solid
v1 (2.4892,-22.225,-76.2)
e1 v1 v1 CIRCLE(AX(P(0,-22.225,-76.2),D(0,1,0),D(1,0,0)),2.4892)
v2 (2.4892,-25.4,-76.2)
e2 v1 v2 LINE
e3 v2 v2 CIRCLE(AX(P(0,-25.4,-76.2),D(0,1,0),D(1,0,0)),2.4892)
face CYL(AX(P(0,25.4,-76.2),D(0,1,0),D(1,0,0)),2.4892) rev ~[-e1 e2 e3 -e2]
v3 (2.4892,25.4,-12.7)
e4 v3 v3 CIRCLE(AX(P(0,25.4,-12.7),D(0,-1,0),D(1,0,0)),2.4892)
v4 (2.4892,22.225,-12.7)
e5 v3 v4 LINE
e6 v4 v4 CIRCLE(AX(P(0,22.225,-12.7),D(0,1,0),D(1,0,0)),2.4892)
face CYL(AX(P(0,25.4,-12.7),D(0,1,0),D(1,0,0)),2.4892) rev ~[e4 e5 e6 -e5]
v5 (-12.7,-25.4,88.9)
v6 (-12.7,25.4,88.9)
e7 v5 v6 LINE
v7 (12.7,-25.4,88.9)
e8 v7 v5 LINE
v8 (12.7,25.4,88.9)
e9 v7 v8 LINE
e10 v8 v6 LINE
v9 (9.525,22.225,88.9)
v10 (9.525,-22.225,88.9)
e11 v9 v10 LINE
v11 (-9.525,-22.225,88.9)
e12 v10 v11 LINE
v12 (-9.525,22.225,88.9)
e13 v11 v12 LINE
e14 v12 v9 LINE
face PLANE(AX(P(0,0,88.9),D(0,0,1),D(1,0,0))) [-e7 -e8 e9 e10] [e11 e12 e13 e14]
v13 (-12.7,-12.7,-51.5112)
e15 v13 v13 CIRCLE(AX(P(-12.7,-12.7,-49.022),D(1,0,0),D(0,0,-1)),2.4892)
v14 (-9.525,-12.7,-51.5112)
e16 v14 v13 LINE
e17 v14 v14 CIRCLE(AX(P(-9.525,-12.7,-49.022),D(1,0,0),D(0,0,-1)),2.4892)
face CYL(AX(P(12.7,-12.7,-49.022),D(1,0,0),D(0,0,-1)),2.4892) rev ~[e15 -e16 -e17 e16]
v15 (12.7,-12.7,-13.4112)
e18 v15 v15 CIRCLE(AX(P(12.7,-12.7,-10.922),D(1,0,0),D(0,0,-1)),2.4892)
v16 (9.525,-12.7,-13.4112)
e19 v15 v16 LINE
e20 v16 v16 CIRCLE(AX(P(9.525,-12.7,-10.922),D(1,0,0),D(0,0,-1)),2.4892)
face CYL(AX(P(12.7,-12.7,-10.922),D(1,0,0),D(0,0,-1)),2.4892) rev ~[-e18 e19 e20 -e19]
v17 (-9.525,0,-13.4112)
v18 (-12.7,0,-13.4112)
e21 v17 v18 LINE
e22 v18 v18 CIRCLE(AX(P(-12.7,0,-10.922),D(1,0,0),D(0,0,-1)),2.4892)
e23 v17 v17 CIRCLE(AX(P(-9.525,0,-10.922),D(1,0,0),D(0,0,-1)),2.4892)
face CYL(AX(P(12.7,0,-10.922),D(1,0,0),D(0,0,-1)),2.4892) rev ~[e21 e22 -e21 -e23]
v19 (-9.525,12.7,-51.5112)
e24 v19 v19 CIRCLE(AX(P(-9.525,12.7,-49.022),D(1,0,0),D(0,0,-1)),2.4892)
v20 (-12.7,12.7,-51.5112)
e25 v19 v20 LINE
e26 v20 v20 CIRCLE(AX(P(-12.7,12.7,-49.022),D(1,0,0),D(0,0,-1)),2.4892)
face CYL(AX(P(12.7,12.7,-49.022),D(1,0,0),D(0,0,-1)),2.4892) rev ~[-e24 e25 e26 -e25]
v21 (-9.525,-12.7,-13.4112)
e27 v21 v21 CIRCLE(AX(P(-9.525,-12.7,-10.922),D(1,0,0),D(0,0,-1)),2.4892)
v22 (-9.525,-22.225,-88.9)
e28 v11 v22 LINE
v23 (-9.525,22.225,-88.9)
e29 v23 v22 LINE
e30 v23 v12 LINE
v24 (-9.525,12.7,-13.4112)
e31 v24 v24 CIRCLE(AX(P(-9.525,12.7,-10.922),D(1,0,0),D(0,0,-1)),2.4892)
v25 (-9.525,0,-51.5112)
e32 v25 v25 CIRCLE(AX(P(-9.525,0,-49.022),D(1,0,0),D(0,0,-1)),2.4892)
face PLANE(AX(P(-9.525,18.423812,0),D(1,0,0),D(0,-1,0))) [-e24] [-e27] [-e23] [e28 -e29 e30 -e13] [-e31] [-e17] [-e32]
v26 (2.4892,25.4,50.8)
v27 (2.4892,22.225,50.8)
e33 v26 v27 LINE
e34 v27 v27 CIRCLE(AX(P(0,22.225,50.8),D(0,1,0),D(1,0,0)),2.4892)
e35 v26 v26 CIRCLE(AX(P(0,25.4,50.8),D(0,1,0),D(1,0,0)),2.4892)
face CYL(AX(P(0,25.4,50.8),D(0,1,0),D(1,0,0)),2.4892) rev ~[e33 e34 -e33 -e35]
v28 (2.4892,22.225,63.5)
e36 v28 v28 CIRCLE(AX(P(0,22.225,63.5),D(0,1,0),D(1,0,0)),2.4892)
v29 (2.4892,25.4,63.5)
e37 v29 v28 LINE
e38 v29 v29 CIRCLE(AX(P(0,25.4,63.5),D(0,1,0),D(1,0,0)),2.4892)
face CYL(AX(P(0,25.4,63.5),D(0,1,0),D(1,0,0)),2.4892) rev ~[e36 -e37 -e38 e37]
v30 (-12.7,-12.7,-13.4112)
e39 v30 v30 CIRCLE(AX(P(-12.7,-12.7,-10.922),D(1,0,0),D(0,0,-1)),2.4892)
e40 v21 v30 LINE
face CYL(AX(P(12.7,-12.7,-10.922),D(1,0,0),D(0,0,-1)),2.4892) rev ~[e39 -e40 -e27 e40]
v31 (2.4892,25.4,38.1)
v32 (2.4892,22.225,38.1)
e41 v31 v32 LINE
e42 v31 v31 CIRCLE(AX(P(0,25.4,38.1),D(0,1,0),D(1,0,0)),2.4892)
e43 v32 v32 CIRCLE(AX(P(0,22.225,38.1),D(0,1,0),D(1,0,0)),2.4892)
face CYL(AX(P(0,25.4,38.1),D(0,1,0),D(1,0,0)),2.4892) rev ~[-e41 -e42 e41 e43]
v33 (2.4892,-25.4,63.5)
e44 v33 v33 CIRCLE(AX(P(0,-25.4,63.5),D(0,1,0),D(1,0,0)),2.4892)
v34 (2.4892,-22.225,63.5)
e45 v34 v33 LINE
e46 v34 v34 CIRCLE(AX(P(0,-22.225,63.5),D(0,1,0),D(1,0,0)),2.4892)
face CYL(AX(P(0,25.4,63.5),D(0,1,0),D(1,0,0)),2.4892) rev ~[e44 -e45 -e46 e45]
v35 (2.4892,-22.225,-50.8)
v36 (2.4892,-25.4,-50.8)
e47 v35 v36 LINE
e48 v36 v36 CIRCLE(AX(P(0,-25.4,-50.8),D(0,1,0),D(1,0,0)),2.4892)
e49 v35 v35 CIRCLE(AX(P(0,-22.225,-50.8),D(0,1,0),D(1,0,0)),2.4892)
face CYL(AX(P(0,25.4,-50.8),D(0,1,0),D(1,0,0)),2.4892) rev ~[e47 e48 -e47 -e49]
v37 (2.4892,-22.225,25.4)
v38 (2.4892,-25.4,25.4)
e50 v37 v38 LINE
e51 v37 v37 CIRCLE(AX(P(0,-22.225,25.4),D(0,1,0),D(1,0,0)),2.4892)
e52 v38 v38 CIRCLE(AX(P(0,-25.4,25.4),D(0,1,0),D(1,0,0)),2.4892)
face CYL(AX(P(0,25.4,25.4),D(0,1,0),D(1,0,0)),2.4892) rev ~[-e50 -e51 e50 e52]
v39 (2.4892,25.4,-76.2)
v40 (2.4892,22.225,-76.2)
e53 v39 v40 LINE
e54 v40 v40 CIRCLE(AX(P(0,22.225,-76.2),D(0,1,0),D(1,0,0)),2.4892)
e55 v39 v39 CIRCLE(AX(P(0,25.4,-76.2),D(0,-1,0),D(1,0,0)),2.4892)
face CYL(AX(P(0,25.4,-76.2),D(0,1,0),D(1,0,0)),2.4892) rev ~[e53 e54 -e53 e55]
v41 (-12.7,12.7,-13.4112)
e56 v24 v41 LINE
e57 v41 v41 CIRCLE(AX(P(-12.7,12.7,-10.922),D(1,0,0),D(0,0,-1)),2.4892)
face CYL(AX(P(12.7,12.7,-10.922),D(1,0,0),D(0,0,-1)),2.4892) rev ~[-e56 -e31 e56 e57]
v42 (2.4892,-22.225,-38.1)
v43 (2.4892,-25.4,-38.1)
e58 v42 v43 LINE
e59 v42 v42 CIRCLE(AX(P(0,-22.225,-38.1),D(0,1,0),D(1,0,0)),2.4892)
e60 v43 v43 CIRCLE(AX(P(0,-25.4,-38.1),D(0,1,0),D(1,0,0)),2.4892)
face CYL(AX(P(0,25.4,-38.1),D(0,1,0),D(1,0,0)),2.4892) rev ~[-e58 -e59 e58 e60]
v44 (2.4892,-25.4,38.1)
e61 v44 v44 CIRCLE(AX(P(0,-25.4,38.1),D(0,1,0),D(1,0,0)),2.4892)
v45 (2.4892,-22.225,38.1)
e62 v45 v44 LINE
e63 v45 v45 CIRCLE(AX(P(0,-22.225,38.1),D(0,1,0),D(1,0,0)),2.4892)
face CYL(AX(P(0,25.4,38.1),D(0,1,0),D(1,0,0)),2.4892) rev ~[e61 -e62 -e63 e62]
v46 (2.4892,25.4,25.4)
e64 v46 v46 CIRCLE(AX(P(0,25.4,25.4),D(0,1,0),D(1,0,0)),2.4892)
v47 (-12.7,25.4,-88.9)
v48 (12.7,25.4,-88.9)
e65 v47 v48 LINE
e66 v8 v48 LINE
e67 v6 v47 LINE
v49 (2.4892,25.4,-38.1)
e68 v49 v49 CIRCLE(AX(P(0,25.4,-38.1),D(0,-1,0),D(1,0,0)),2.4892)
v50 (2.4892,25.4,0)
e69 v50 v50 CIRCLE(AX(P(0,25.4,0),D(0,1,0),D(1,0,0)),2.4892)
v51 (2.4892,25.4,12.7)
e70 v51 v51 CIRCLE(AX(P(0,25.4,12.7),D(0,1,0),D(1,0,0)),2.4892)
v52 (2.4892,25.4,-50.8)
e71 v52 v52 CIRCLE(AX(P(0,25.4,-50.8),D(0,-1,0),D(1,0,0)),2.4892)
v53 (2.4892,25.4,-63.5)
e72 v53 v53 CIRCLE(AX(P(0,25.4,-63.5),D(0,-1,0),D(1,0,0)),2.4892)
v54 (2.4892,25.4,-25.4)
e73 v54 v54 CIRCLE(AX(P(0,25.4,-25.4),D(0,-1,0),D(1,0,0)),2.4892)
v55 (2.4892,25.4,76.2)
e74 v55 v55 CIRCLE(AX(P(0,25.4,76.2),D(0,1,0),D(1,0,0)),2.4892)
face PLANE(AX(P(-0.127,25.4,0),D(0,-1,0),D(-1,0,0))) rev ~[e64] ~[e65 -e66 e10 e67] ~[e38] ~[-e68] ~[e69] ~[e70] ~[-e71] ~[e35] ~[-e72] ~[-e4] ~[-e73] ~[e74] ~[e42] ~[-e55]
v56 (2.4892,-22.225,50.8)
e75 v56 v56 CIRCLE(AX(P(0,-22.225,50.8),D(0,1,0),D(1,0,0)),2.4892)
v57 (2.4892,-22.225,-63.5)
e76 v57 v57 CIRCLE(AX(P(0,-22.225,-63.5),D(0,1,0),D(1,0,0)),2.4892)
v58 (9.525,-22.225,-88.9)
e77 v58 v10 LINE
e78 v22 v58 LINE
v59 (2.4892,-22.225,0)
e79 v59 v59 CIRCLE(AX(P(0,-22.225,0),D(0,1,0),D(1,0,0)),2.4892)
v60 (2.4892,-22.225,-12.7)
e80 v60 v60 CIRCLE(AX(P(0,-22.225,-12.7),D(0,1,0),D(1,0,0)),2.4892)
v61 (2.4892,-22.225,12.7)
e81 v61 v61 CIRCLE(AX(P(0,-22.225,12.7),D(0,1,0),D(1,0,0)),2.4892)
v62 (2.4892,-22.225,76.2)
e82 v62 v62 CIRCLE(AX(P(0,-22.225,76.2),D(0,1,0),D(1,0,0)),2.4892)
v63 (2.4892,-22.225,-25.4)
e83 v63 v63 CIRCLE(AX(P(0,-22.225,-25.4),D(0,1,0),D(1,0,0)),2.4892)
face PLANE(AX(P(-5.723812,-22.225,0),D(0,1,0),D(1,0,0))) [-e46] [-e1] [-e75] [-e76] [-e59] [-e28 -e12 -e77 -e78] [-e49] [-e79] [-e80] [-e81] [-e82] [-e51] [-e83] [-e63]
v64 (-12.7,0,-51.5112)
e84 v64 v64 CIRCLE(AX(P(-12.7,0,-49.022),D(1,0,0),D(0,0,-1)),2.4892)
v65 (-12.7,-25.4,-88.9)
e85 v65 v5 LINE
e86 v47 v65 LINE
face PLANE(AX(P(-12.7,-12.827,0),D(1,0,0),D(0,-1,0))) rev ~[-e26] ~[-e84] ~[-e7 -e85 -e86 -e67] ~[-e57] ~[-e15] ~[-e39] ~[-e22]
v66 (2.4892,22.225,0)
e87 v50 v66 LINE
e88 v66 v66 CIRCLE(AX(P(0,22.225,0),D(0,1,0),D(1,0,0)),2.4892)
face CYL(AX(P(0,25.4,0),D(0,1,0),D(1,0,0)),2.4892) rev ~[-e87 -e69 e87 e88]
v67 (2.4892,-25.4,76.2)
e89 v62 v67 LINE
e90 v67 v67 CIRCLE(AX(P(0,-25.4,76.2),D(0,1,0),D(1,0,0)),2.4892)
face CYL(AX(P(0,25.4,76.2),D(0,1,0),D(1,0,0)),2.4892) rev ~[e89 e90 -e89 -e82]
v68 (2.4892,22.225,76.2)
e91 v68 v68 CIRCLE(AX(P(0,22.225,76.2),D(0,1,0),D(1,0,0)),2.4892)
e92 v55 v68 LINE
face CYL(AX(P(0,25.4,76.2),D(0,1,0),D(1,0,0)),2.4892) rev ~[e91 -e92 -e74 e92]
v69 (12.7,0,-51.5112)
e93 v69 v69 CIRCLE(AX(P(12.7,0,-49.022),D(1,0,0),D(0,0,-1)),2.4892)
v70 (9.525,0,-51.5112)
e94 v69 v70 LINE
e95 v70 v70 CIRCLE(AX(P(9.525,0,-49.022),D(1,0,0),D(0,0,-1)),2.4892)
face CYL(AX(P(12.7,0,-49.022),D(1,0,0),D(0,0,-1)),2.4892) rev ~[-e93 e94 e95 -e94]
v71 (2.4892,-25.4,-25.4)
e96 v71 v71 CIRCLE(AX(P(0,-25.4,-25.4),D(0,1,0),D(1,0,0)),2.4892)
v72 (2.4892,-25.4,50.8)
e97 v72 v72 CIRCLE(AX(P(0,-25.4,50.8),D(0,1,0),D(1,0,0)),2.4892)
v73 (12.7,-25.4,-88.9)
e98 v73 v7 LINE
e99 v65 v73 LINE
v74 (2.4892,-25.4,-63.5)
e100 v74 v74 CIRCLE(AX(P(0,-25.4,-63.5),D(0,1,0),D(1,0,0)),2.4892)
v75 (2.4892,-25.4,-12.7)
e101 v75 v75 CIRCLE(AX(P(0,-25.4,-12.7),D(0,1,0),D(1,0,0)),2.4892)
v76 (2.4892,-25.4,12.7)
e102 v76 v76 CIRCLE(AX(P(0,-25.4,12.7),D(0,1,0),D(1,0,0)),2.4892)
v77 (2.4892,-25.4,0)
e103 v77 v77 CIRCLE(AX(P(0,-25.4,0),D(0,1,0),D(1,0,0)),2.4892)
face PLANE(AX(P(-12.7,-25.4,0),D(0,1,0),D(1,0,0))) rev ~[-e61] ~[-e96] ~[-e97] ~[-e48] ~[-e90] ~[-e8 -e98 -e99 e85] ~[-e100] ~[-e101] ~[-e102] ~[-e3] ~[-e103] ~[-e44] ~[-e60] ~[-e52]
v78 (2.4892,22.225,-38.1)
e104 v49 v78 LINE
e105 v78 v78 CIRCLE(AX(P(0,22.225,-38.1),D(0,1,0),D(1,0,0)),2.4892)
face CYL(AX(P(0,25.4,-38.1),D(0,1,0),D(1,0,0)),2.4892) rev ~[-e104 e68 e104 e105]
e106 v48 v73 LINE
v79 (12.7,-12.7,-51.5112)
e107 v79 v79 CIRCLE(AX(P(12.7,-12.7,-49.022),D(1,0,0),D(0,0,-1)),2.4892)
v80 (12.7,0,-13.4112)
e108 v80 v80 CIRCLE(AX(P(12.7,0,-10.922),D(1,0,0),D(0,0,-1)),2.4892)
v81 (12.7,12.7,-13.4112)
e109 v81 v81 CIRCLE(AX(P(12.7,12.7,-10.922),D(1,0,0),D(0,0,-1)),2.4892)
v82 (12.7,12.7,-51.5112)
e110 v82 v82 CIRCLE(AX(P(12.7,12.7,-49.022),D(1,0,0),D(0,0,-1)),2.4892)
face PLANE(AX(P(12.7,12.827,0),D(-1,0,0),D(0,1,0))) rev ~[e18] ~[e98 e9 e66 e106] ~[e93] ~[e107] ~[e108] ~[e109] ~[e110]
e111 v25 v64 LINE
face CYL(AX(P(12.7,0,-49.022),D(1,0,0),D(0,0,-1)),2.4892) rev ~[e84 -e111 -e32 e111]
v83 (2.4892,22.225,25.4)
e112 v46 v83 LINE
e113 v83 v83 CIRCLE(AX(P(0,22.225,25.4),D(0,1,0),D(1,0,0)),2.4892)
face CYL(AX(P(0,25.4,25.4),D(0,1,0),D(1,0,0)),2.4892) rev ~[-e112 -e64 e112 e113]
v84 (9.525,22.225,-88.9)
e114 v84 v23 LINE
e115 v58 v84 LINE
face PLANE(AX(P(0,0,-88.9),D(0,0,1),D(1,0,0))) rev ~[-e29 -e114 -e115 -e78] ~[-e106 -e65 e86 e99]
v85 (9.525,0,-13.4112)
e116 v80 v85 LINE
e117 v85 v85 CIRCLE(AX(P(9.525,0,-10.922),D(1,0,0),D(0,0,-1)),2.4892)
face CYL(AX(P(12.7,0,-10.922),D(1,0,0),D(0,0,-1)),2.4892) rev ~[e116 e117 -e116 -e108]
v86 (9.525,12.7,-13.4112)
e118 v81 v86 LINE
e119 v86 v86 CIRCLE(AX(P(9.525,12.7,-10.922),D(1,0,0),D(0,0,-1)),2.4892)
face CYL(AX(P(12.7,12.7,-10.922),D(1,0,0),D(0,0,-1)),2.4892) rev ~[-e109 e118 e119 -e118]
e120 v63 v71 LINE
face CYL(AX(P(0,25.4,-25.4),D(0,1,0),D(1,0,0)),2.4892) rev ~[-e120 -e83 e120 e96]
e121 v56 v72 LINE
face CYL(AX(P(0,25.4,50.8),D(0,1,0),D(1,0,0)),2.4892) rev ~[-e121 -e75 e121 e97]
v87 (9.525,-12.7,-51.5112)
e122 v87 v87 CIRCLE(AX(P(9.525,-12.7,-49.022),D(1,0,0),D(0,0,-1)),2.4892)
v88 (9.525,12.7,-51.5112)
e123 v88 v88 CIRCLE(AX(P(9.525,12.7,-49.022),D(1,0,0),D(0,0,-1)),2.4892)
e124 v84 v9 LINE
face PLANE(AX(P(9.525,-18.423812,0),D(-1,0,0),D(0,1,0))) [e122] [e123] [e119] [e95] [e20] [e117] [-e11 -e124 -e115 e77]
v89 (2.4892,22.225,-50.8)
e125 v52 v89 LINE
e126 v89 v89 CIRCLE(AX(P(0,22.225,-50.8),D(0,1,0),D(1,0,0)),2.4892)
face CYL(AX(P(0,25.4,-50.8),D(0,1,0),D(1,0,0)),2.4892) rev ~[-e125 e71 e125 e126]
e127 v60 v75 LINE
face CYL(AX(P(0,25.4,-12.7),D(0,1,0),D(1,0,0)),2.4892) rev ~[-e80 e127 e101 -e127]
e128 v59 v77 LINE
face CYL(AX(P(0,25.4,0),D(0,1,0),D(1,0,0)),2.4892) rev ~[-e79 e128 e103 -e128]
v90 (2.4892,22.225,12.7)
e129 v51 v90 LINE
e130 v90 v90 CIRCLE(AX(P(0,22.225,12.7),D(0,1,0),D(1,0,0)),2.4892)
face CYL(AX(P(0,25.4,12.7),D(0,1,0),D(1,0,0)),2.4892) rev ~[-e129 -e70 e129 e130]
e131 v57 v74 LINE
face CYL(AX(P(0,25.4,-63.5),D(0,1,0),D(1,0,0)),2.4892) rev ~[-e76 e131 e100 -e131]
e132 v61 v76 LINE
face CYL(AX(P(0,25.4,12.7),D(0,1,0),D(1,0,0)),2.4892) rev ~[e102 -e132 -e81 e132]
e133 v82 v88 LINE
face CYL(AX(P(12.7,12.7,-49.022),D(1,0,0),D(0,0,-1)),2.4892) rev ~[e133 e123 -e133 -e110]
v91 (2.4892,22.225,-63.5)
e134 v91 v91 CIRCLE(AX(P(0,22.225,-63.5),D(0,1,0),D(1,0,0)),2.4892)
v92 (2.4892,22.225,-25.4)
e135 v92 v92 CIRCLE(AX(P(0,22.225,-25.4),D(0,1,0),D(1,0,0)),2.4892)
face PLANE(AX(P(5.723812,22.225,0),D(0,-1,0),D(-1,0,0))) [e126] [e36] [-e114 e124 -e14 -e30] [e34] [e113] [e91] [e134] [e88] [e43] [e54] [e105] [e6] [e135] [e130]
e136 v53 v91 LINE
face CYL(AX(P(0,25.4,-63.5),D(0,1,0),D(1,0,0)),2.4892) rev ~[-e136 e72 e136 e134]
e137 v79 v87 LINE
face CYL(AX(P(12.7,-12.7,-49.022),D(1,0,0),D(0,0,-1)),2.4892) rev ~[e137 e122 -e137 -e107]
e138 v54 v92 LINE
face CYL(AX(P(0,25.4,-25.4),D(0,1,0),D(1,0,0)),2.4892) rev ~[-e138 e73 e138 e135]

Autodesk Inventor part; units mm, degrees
ref_plane "YZ Plane" through (0, 0, 0) normal (1, 0, 0) x (0, 1, 0)
sketch "Corner" plane through (0, 0, 0) normal (0, 0, 1) x (1, 0, 0)
  line L0 (-6.5971, 24.384) -> (-10.9924, 24.384)
  arc A0 (-10.9924, 24.384) -> (-11.684, 23.6924) centre (-10.9924, 23.6924) ccw
  line L1 (-11.684, 23.6924) -> (-11.684, 19.2971)
  arc A1 (-11.684, 19.2971) -> (-10.3994, 18.9412) centre (-10.9924, 19.2971) ccw
  arc A2 (-6.2412, 23.0994) -> (-6.5971, 24.384) centre (-6.5971, 23.6924) ccw
  arc A3 (-6.2412, 23.0994) -> (-10.3994, 18.9412) centre (0, 12.7) ccw
  arc A4 (-4.8895, 22.679) -> (-9.979, 17.5895) centre (0, 12.7) ccw
  line L2 (-9.979, 17.5895) -> (-11.684, 17.5895)
  line L3 (-4.8895, 22.679) -> (-4.8895, 24.384)
  line L4 (-11.684, 23.6924) -> (-11.684, 24.384)
  line L5 (-11.684, 24.384) -> (-10.9924, 24.384)
  line L6 (-11.684, 17.5895) -> (-11.684, 19.2971)
  line L7 (-4.8895, 24.384) -> (-6.5971, 24.384)
  point P0 (-8.4584, 21.1584)
  dimension "d3" = 3.175
  dimension "d4" = 11.1125
  dimension "d8" = 0
  dimension "d9" = 0
  dimension "d10" = 0
  dimension "d11" = 2.159
  dimension "d12" = 2.159
  dimension "d5" = 1.016
  dimension "d6" = 1.705
  dimension "d7" = 0.6916
sketch "MAXTube" plane through (0, 0, 0) normal (0, 0, 1) x (1, 0, 0)
  arc A0 (-5.3052, 13.2526) -> (-8.8244, 11.2207) centre (0, 0) ccw
  arc A1 (-11.1818, 11.0863) -> (-8.8244, 11.2207) centre (-10.0994, 12.842) ccw
  arc A2 (-11.1818, 11.0863) -> (-13.8706, 10.5882) centre (-12.251, 9.3519) ccw
  arc A3 (-13.8706, 10.5882) -> (-16.1049, 6.7182) centre (0, 0) ccw
  arc A4 (-16.1049, 6.7182) -> (-15.1919, 4.1406) centre (-14.2245, 5.9338) ccw
  arc A5 (-14.1297, 2.0318) -> (-15.1919, 4.1406) centre (-16.1712, 2.3254) ccw
  arc A6 (-14.1297, 2.0318) -> (-14.1297, -2.0318) centre (0, 0) ccw
  arc A7 (-15.1919, -4.1406) -> (-14.1297, -2.0318) centre (-16.1712, -2.3254) ccw
  arc A8 (-15.1919, -4.1406) -> (-16.1049, -6.7182) centre (-14.2245, -5.9338) ccw
  arc A9 (-16.1049, -6.7182) -> (-13.8706, -10.5882) centre (0, 0) ccw
  arc A10 (-13.8706, -10.5882) -> (-11.1818, -11.0863) centre (-12.251, -9.3519) ccw
  arc A11 (-8.8244, -11.2207) -> (-11.1818, -11.0863) centre (-10.0994, -12.842) ccw
  arc A12 (-8.8244, -11.2207) -> (-5.3052, -13.2526) centre (0, 0) ccw
  arc A13 (-4.0101, -15.2268) -> (-5.3052, -13.2526) centre (-6.0718, -15.1673) ccw
  arc A14 (-4.0101, -15.2268) -> (-2.2343, -17.3064) centre (-1.9735, -15.2856) ccw
  arc A15 (-2.2343, -17.3064) -> (2.2343, -17.3064) centre (0, 0) ccw
  arc A16 (2.2343, -17.3064) -> (4.0101, -15.2268) centre (1.9735, -15.2856) ccw
  arc A17 (5.3052, -13.2526) -> (4.0101, -15.2268) centre (6.0718, -15.1673) ccw
  arc A18 (5.3052, -13.2526) -> (8.8244, -11.2207) centre (0, 0) ccw
  arc A19 (11.1818, -11.0863) -> (8.8244, -11.2207) centre (10.0994, -12.842) ccw
  arc A20 (11.1818, -11.0863) -> (13.8706, -10.5882) centre (12.251, -9.3519) ccw
  arc A21 (13.8706, -10.5882) -> (16.1049, -6.7182) centre (0, 0) ccw
  arc A22 (16.1049, -6.7182) -> (15.1919, -4.1406) centre (14.2245, -5.9338) ccw
  arc A23 (14.1297, -2.0318) -> (15.1919, -4.1406) centre (16.1712, -2.3254) ccw
  arc A24 (14.1297, -2.0318) -> (14.1297, 2.0318) centre (0, 0) ccw
  arc A25 (15.1919, 4.1406) -> (14.1297, 2.0318) centre (16.1712, 2.3254) ccw
  arc A26 (15.1919, 4.1406) -> (16.1049, 6.7182) centre (14.2245, 5.9338) ccw
  arc A27 (16.1049, 6.7182) -> (13.8706, 10.5882) centre (0, 0) ccw
  arc A28 (13.8706, 10.5882) -> (11.1818, 11.0863) centre (12.251, 9.3519) ccw
  arc A29 (8.8244, 11.2207) -> (11.1818, 11.0863) centre (10.0994, 12.842) ccw
  arc A30 (8.8244, 11.2207) -> (5.3052, 13.2526) centre (0, 0) ccw
  arc A31 (4.0101, 15.2268) -> (5.3052, 13.2526) centre (6.0718, 15.1673) ccw
  arc A32 (4.0101, 15.2268) -> (2.2343, 17.3064) centre (1.9735, 15.2856) ccw
  arc A33 (2.2343, 17.3064) -> (-2.2343, 17.3064) centre (0, 0) ccw
  arc A34 (-2.2343, 17.3064) -> (-4.0101, 15.2268) centre (-1.9735, 15.2856) ccw
  arc A35 (-5.3052, 13.2526) -> (-4.0101, 15.2268) centre (-6.0718, 15.1673) ccw
  arc A36 (-4.7199, 11.7904) -> (-7.8508, 9.9827) centre (0, 0) ccw
  arc A37 (-4.7199, 11.7904) -> (-2.4358, 15.2723) centre (-6.0718, 15.1673) ccw
  arc A38 (-2.0327, 15.7443) -> (-2.4358, 15.2723) centre (-1.9735, 15.2856) ccw
  arc A39 (2.0327, 15.7443) -> (-2.0327, 15.7443) centre (0, 0) ccw
  arc A40 (2.4358, 15.2723) -> (2.0327, 15.7443) centre (1.9735, 15.2856) ccw
  arc A41 (2.4358, 15.2723) -> (4.7199, 11.7904) centre (6.0718, 15.1673) ccw
  arc A42 (7.8508, 9.9827) -> (4.7199, 11.7904) centre (0, 0) ccw
  arc A43 (7.8508, 9.9827) -> (12.0083, 9.7456) centre (10.0994, 12.842) ccw
  arc A44 (12.6186, 9.6325) -> (12.0083, 9.7456) centre (12.251, 9.3519) ccw
  arc A45 (14.6513, 6.1118) -> (12.6186, 9.6325) centre (0, 0) ccw
  arc A46 (14.4441, 5.5267) -> (14.6513, 6.1118) centre (14.2245, 5.9338) ccw
  arc A47 (14.4441, 5.5267) -> (12.5707, 1.8076) centre (16.1712, 2.3254) ccw
  arc A48 (12.5707, -1.8076) -> (12.5707, 1.8076) centre (0, 0) ccw
  arc A49 (12.5707, -1.8076) -> (14.4441, -5.5267) centre (16.1712, -2.3254) ccw
  arc A50 (14.6513, -6.1118) -> (14.4441, -5.5267) centre (14.2245, -5.9338) ccw
  arc A51 (12.6186, -9.6325) -> (14.6513, -6.1118) centre (0, 0) ccw
  arc A52 (12.0083, -9.7456) -> (12.6186, -9.6325) centre (12.251, -9.3519) ccw
  arc A53 (12.0083, -9.7456) -> (7.8508, -9.9827) centre (10.0994, -12.842) ccw
  arc A54 (4.7199, -11.7904) -> (7.8508, -9.9827) centre (0, 0) ccw
  arc A55 (4.7199, -11.7904) -> (2.4358, -15.2723) centre (6.0718, -15.1673) ccw
  arc A56 (2.0327, -15.7443) -> (2.4358, -15.2723) centre (1.9735, -15.2856) ccw
  arc A57 (-2.0327, -15.7443) -> (2.0327, -15.7443) centre (0, 0) ccw
  arc A58 (-2.4358, -15.2723) -> (-2.0327, -15.7443) centre (-1.9735, -15.2856) ccw
  arc A59 (-2.4358, -15.2723) -> (-4.7199, -11.7904) centre (-6.0718, -15.1673) ccw
  arc A60 (-7.8508, -9.9827) -> (-4.7199, -11.7904) centre (0, 0) ccw
  arc A61 (-7.8508, -9.9827) -> (-12.0083, -9.7456) centre (-10.0994, -12.842) ccw
  arc A62 (-12.6186, -9.6325) -> (-12.0083, -9.7456) centre (-12.251, -9.3519) ccw
  arc A63 (-14.6513, -6.1118) -> (-12.6186, -9.6325) centre (0, 0) ccw
  arc A64 (-14.4441, -5.5267) -> (-14.6513, -6.1118) centre (-14.2245, -5.9338) ccw
  arc A65 (-14.4441, -5.5267) -> (-12.5707, -1.8076) centre (-16.1712, -2.3254) ccw
  arc A66 (-12.5707, 1.8076) -> (-12.5707, -1.8076) centre (0, 0) ccw
  arc A67 (-12.5707, 1.8076) -> (-14.4441, 5.5267) centre (-16.1712, 2.3254) ccw
  arc A68 (-14.6513, 6.1118) -> (-14.4441, 5.5267) centre (-14.2245, 5.9338) ccw
  arc A69 (-12.6186, 9.6325) -> (-14.6513, 6.1118) centre (0, 0) ccw
  arc A70 (-12.0083, 9.7456) -> (-12.6186, 9.6325) centre (-12.251, 9.3519) ccw
  arc A71 (-12.0083, 9.7456) -> (-7.8508, 9.9827) centre (-10.0994, 12.842) ccw
  point P0 (0, 0)
sketch "Base Sketch" plane through (0, 0, 0) normal (0, 0, 1) x (1, 0, 0)
  line L0 (-12.7, -25.4) -> (12.7, -25.4)
  line L1 (12.7, -25.4) -> (12.7, 25.4)
  line L2 (12.7, 25.4) -> (-12.7, 25.4)
  line L3 (-12.7, 25.4) -> (-12.7, -25.4)
  line L4 (-12.7, -25.4) -> (12.7, 25.4) construction
  line L5 (12.7, -25.4) -> (-12.7, 25.4) construction
  line L6 (-9.525, -22.225) -> (9.525, -22.225)
  line L7 (9.525, -22.225) -> (9.525, 22.225)
  line L8 (9.525, 22.225) -> (-9.525, 22.225)
  line L9 (-9.525, 22.225) -> (-9.525, -22.225)
  line L10 (-9.525, -22.225) -> (9.525, 22.225) construction
  line L11 (9.525, -22.225) -> (-9.525, 22.225) construction
  line L12 (-0.127, 25.4) -> (0, 25.273)
  line L13 (0, 25.273) -> (0.127, 25.4)
  line L14 (-0.127, -25.4) -> (0, -25.273)
  line L15 (0, -25.273) -> (0.127, -25.4)
  line L16 (-12.7, -12.573) -> (-12.573, -12.7)
  line L17 (-12.573, -12.7) -> (-12.7, -12.827)
  line L18 (12.7, -12.573) -> (12.573, -12.7)
  line L19 (12.7, -12.827) -> (12.573, -12.7)
  line L20 (-12.7, 12.827) -> (-12.573, 12.7)
  line L21 (-12.573, 12.7) -> (-12.7, 12.573)
  line L22 (12.7, 12.827) -> (12.573, 12.7)
  line L23 (12.573, 12.7) -> (12.7, 12.573)
  line L24 (-12.7, 0.127) -> (-12.573, 0)
  line L25 (-12.573, 0) -> (-12.7, -0.127)
  line L26 (12.7, 0.127) -> (12.573, 0)
  line L27 (12.573, 0) -> (12.7, -0.127)
  line L28 (-6.5971, 24.384) -> (-10.9924, 24.384)
  arc A0 (-10.9924, 24.384) -> (-11.684, 23.6924) centre (-10.9924, 23.6924) ccw
  line L29 (-11.684, 23.6924) -> (-11.684, 19.2971)
  arc A1 (-11.684, 19.2971) -> (-10.3994, 18.9412) centre (-10.9924, 19.2971) ccw
  arc A2 (-6.2412, 23.0994) -> (-6.5971, 24.384) centre (-6.5971, 23.6924) ccw
  arc A3 (-6.2412, 23.0994) -> (-10.3994, 18.9412) centre (0, 12.7) ccw
  arc A4 (-4.8895, 22.679) -> (-9.979, 17.5895) centre (0, 12.7) ccw
  line L30 (-9.979, 17.5895) -> (-11.684, 17.5895)
  line L31 (-4.8895, 22.679) -> (-4.8895, 24.384)
  line L32 (-11.684, 23.6924) -> (-11.684, 24.384)
  line L33 (-11.684, 24.384) -> (-10.9924, 24.384)
  line L34 (-11.684, 17.5895) -> (-11.684, 19.2971)
  line L35 (-4.8895, 24.384) -> (-6.5971, 24.384)
  line L36 (11.684, 19.2971) -> (11.684, 23.6924)
  arc A5 (11.684, 23.6924) -> (10.9924, 24.384) centre (10.9924, 23.6924) ccw
  line L37 (10.9924, 24.384) -> (6.5971, 24.384)
  arc A6 (6.5971, 24.384) -> (6.2412, 23.0994) centre (6.5971, 23.6924) ccw
  arc A7 (10.3994, 18.9412) -> (11.684, 19.2971) centre (10.9924, 19.2971) ccw
  arc A8 (10.3994, 18.9412) -> (6.2412, 23.0994) centre (0, 12.7) ccw
  arc A9 (9.979, 17.5895) -> (4.8895, 22.679) centre (0, 12.7) ccw
  line L38 (4.8895, 22.679) -> (4.8895, 24.384)
  line L39 (9.979, 17.5895) -> (11.684, 17.5895)
  line L40 (10.9924, 24.384) -> (11.684, 24.384)
  line L41 (11.684, 24.384) -> (11.684, 23.6924)
  line L42 (4.8895, 24.384) -> (6.5971, 24.384)
  line L43 (11.684, 17.5895) -> (11.684, 19.2971)
  line L44 (6.5971, -24.384) -> (10.9924, -24.384)
  arc A10 (10.9924, -24.384) -> (11.684, -23.6924) centre (10.9924, -23.6924) ccw
  line L45 (11.684, -23.6924) -> (11.684, -19.2971)
  arc A11 (11.684, -19.2971) -> (10.3994, -18.9412) centre (10.9924, -19.2971) ccw
  arc A12 (6.2412, -23.0994) -> (6.5971, -24.384) centre (6.5971, -23.6924) ccw
  arc A13 (6.2412, -23.0994) -> (10.3994, -18.9412) centre (0, -12.7) ccw
  arc A14 (4.8895, -22.679) -> (9.979, -17.5895) centre (0, -12.7) ccw
  line L46 (9.979, -17.5895) -> (11.684, -17.5895)
  line L47 (4.8895, -22.679) -> (4.8895, -24.384)
  line L48 (11.684, -23.6924) -> (11.684, -24.384)
  line L49 (11.684, -24.384) -> (10.9924, -24.384)
  line L50 (11.684, -17.5895) -> (11.684, -19.2971)
  line L51 (4.8895, -24.384) -> (6.5971, -24.384)
  line L52 (-11.684, -19.2971) -> (-11.684, -23.6924)
  arc A15 (-11.684, -23.6924) -> (-10.9924, -24.384) centre (-10.9924, -23.6924) ccw
  line L53 (-10.9924, -24.384) -> (-6.5971, -24.384)
  arc A16 (-6.5971, -24.384) -> (-6.2412, -23.0994) centre (-6.5971, -23.6924) ccw
  arc A17 (-10.3994, -18.9412) -> (-11.684, -19.2971) centre (-10.9924, -19.2971) ccw
  arc A18 (-10.3994, -18.9412) -> (-6.2412, -23.0994) centre (0, -12.7) ccw
  arc A19 (-9.979, -17.5895) -> (-4.8895, -22.679) centre (0, -12.7) ccw
  line L54 (-4.8895, -22.679) -> (-4.8895, -24.384)
  line L55 (-9.979, -17.5895) -> (-11.684, -17.5895)
  line L56 (-10.9924, -24.384) -> (-11.684, -24.384)
  line L57 (-11.684, -24.384) -> (-11.684, -23.6924)
  line L58 (-4.8895, -24.384) -> (-6.5971, -24.384)
  line L59 (-11.684, -17.5895) -> (-11.684, -19.2971)
  point P0 (0, 0)
  point P1 (-12.7, 0)
  dimension "d17" = 1.016
  dimension "d0" = 50.8
  dimension "d1" = 25.4
  dimension "d2" = 3.175
  dimension "d3" = 3.175
  dimension "d16" = 1.016
  dimension "d18" = 1.016
  dimension "d19" = 1.016
  dimension "d26" = 0.127
  dimension "d34" = 12.7
  dimension "d35" = 12.7
extrude "Base" add sketch "Base Sketch" along normal mid plane 177.8 contours L3 L17 L16 L25 L24 L21 L20 L2 L12 L13 L1 L22 L23 L26 L27 L18 L19 L0 L15 L14 | L14 L15 L0 | L3 L16 L17 | L3 L24 L25 | L19 L18 L1 | L3 L20 L21 | L27 L26 L1 | L23 L22 L1 | L2 L13 L12 | L6 A18 A16 L53 A15 L52 A17 L9 | L6 A19 L54 L58 A16 A18 | A18 A17 L59 L55 A19 L9 | L6 A13 A12 L51 L47 A14 | A4 L30 L34 A1 A3 L9 | L6 L7 A13 A11 L45 A10 L44 A12 | A14 L46 L50 A11 A13 L7 | L56 L57 A15 | A3 A1 L29 A0 L28 A2 L8 L9 | L8 A3 A2 L35 L31 A4 | L7 A8 A7 L43 L39 A9 | A9 L38 L42 A6 A8 L8 | L7 L8 A8 A6 L37 A5 L36 A7 | A10 L48 L49 | L32 L33 A0 | A5 L40 L41
extrude "MAX Corner" [suppressed]
extrude "MAX Corner Cut" [suppressed]
extrude "Scribe Lines" [suppressed]
ref_plane "Side Middle" through (0, 0, 0) normal (0, 0, 1) x (1, 0, 0)
ref_plane "Top Middle" through (0, 0, 0) normal (0, 0, 1) x (1, 0, 0)
sketch "Side Holes Sketch" plane through (12.7, -25.4, 88.9) normal (1, 0, 0) x (0, 0, -1)
  line L0 (0, 0) -> (0, 50.8) construction
  line L1 (0, 25.4) -> (177.8, 25.4) construction
  line L2 (177.8, 3.175) -> (177.8, 47.625) construction
  line L3 (177.8, 50.8) -> (0, 50.8) construction
  point P0 (88.9, 25.4)
  point P1 (12.7, 12.7)
  point P2 (12.7, 25.4)
  point P3 (12.7, 38.1)
  dimension "d38" = 12.7
  dimension "d61" = 12.7
hole "Top Side Hole" [suppressed]
hole "Mid Side Hole" [suppressed]
hole "Btm Side Hole" [suppressed]
pattern_linear "Side Holes" [suppressed]
mirror "Side Mirror" [suppressed]
sketch "Sketch3" plane through (12.7, -25.4, 88.9) normal (1, 0, 0) x (0, 0, -1)
  line L0 (0, 0) -> (0, 50.8) projected
  line L1 (177.8, 50.8) -> (0, 50.8) projected
  line L2 (177.8, 50.8) -> (177.8, 0) projected
  arc A0 (26.8793, 34.2244) -> (24.8474, 30.7052) centre (38.1, 25.4) ccw
  arc A1 (22.8732, 29.4101) -> (24.8474, 30.7052) centre (22.9327, 31.4718) ccw
  arc A2 (22.8732, 29.4101) -> (20.7936, 27.6343) centre (22.8144, 27.3735) ccw
  arc A3 (20.7936, 27.6343) -> (20.7936, 23.1657) centre (38.1, 25.4) ccw
  arc A4 (20.7936, 23.1657) -> (22.8732, 21.3899) centre (22.8144, 23.4265) ccw
  arc A5 (24.8474, 20.0948) -> (22.8732, 21.3899) centre (22.9327, 19.3282) ccw
  arc A6 (24.8474, 20.0948) -> (26.8793, 16.5756) centre (38.1, 25.4) ccw
  arc A7 (27.0137, 14.2182) -> (26.8793, 16.5756) centre (25.258, 15.3006) ccw
  arc A8 (27.0137, 14.2182) -> (27.5118, 11.5294) centre (28.7481, 13.149) ccw
  arc A9 (27.5118, 11.5294) -> (31.3818, 9.2951) centre (38.1, 25.4) ccw
  arc A10 (31.3818, 9.2951) -> (33.9594, 10.2081) centre (32.1662, 11.1755) ccw
  arc A11 (36.0682, 11.2703) -> (33.9594, 10.2081) centre (35.7746, 9.2288) ccw
  arc A12 (36.0682, 11.2703) -> (40.1318, 11.2703) centre (38.1, 25.4) ccw
  arc A13 (42.2406, 10.2081) -> (40.1318, 11.2703) centre (40.4254, 9.2288) ccw
  arc A14 (42.2406, 10.2081) -> (44.8182, 9.2951) centre (44.0338, 11.1755) ccw
  arc A15 (44.8182, 9.2951) -> (48.6882, 11.5294) centre (38.1, 25.4) ccw
  arc A16 (48.6882, 11.5294) -> (49.1863, 14.2182) centre (47.4519, 13.149) ccw
  arc A17 (49.3207, 16.5756) -> (49.1863, 14.2182) centre (50.942, 15.3006) ccw
  arc A18 (49.3207, 16.5756) -> (51.3526, 20.0948) centre (38.1, 25.4) ccw
  arc A19 (53.3268, 21.3899) -> (51.3526, 20.0948) centre (53.2673, 19.3282) ccw
  arc A20 (53.3268, 21.3899) -> (55.4064, 23.1657) centre (53.3856, 23.4265) ccw
  arc A21 (55.4064, 23.1657) -> (55.4064, 27.6343) centre (38.1, 25.4) ccw
  arc A22 (55.4064, 27.6343) -> (53.3268, 29.4101) centre (53.3856, 27.3735) ccw
  arc A23 (51.3526, 30.7052) -> (53.3268, 29.4101) centre (53.2673, 31.4718) ccw
  arc A24 (51.3526, 30.7052) -> (49.3207, 34.2244) centre (38.1, 25.4) ccw
  arc A25 (49.1863, 36.5818) -> (49.3207, 34.2244) centre (50.942, 35.4994) ccw
  arc A26 (49.1863, 36.5818) -> (48.6882, 39.2706) centre (47.4519, 37.651) ccw
  arc A27 (48.6882, 39.2706) -> (44.8182, 41.5049) centre (38.1, 25.4) ccw
  arc A28 (44.8182, 41.5049) -> (42.2406, 40.5919) centre (44.0338, 39.6245) ccw
  arc A29 (40.1318, 39.5297) -> (42.2406, 40.5919) centre (40.4254, 41.5712) ccw
  arc A30 (40.1318, 39.5297) -> (36.0682, 39.5297) centre (38.1, 25.4) ccw
  arc A31 (33.9594, 40.5919) -> (36.0682, 39.5297) centre (35.7746, 41.5712) ccw
  arc A32 (33.9594, 40.5919) -> (31.3818, 41.5049) centre (32.1662, 39.6245) ccw
  arc A33 (31.3818, 41.5049) -> (27.5118, 39.2706) centre (38.1, 25.4) ccw
  arc A34 (27.5118, 39.2706) -> (27.0137, 36.5818) centre (28.7481, 37.651) ccw
  arc A35 (26.8793, 34.2244) -> (27.0137, 36.5818) centre (25.258, 35.4994) ccw
  arc A36 (28.1173, 33.2508) -> (26.3096, 30.1199) centre (38.1, 25.4) ccw
  arc A37 (28.1173, 33.2508) -> (28.3544, 37.4083) centre (25.258, 35.4994) ccw
  arc A38 (28.4675, 38.0186) -> (28.3544, 37.4083) centre (28.7481, 37.651) ccw
  arc A39 (31.9882, 40.0513) -> (28.4675, 38.0186) centre (38.1, 25.4) ccw
  arc A40 (32.5733, 39.8441) -> (31.9882, 40.0513) centre (32.1662, 39.6245) ccw
  arc A41 (32.5733, 39.8441) -> (36.2924, 37.9707) centre (35.7746, 41.5712) ccw
  arc A42 (39.9076, 37.9707) -> (36.2924, 37.9707) centre (38.1, 25.4) ccw
  arc A43 (39.9076, 37.9707) -> (43.6267, 39.8441) centre (40.4254, 41.5712) ccw
  arc A44 (44.2118, 40.0513) -> (43.6267, 39.8441) centre (44.0338, 39.6245) ccw
  arc A45 (47.7325, 38.0186) -> (44.2118, 40.0513) centre (38.1, 25.4) ccw
  arc A46 (47.8456, 37.4083) -> (47.7325, 38.0186) centre (47.4519, 37.651) ccw
  arc A47 (47.8456, 37.4083) -> (48.0827, 33.2508) centre (50.942, 35.4994) ccw
  arc A48 (49.8904, 30.1199) -> (48.0827, 33.2508) centre (38.1, 25.4) ccw
  arc A49 (49.8904, 30.1199) -> (53.3723, 27.8358) centre (53.2673, 31.4718) ccw
  arc A50 (53.8443, 27.4327) -> (53.3723, 27.8358) centre (53.3856, 27.3735) ccw
  arc A51 (53.8443, 23.3673) -> (53.8443, 27.4327) centre (38.1, 25.4) ccw
  arc A52 (53.3723, 22.9642) -> (53.8443, 23.3673) centre (53.3856, 23.4265) ccw
  arc A53 (53.3723, 22.9642) -> (49.8904, 20.6801) centre (53.2673, 19.3282) ccw
  arc A54 (48.0827, 17.5492) -> (49.8904, 20.6801) centre (38.1, 25.4) ccw
  arc A55 (48.0827, 17.5492) -> (47.8456, 13.3917) centre (50.942, 15.3006) ccw
  arc A56 (47.7325, 12.7814) -> (47.8456, 13.3917) centre (47.4519, 13.149) ccw
  arc A57 (44.2118, 10.7487) -> (47.7325, 12.7814) centre (38.1, 25.4) ccw
  arc A58 (43.6267, 10.9559) -> (44.2118, 10.7487) centre (44.0338, 11.1755) ccw
  arc A59 (43.6267, 10.9559) -> (39.9076, 12.8293) centre (40.4254, 9.2288) ccw
  arc A60 (36.2924, 12.8293) -> (39.9076, 12.8293) centre (38.1, 25.4) ccw
  arc A61 (36.2924, 12.8293) -> (32.5733, 10.9559) centre (35.7746, 9.2288) ccw
  arc A62 (31.9882, 10.7487) -> (32.5733, 10.9559) centre (32.1662, 11.1755) ccw
  arc A63 (28.4675, 12.7814) -> (31.9882, 10.7487) centre (38.1, 25.4) ccw
  arc A64 (28.3544, 13.3917) -> (28.4675, 12.7814) centre (28.7481, 13.149) ccw
  arc A65 (28.3544, 13.3917) -> (28.1173, 17.5492) centre (25.258, 15.3006) ccw
  arc A66 (26.3096, 20.6801) -> (28.1173, 17.5492) centre (38.1, 25.4) ccw
  arc A67 (26.3096, 20.6801) -> (22.8277, 22.9642) centre (22.9327, 19.3282) ccw
  arc A68 (22.3557, 23.3673) -> (22.8277, 22.9642) centre (22.8144, 23.4265) ccw
  arc A69 (22.3557, 27.4327) -> (22.3557, 23.3673) centre (38.1, 25.4) ccw
  arc A70 (22.8277, 27.8358) -> (22.3557, 27.4327) centre (22.8144, 27.3735) ccw
  arc A71 (22.8277, 27.8358) -> (26.3096, 30.1199) centre (22.9327, 31.4718) ccw
  arc A72 (-23.9207, 34.2244) -> (-25.9526, 30.7052) centre (-12.7, 25.4) ccw
  arc A73 (-27.9268, 29.4101) -> (-25.9526, 30.7052) centre (-27.8673, 31.4718) ccw
  arc A74 (-27.9268, 29.4101) -> (-30.0064, 27.6343) centre (-27.9856, 27.3735) ccw
  arc A75 (-30.0064, 27.6343) -> (-30.0064, 23.1657) centre (-12.7, 25.4) ccw
  arc A76 (-30.0064, 23.1657) -> (-27.9268, 21.3899) centre (-27.9856, 23.4265) ccw
  arc A77 (-25.9526, 20.0948) -> (-27.9268, 21.3899) centre (-27.8673, 19.3282) ccw
  arc A78 (-25.9526, 20.0948) -> (-23.9207, 16.5756) centre (-12.7, 25.4) ccw
  arc A79 (-23.7863, 14.2182) -> (-23.9207, 16.5756) centre (-25.542, 15.3006) ccw
  arc A80 (-23.7863, 14.2182) -> (-23.2882, 11.5294) centre (-22.0519, 13.149) ccw
  arc A81 (-23.2882, 11.5294) -> (-19.4182, 9.2951) centre (-12.7, 25.4) ccw
  arc A82 (-19.4182, 9.2951) -> (-16.8406, 10.2081) centre (-18.6338, 11.1755) ccw
  arc A83 (-14.7318, 11.2703) -> (-16.8406, 10.2081) centre (-15.0254, 9.2288) ccw
  arc A84 (-14.7318, 11.2703) -> (-10.6682, 11.2703) centre (-12.7, 25.4) ccw
  arc A85 (-8.5594, 10.2081) -> (-10.6682, 11.2703) centre (-10.3746, 9.2288) ccw
  arc A86 (-8.5594, 10.2081) -> (-5.9818, 9.2951) centre (-6.7662, 11.1755) ccw
  arc A87 (-5.9818, 9.2951) -> (-2.1118, 11.5294) centre (-12.7, 25.4) ccw
  arc A88 (-2.1118, 11.5294) -> (-1.6137, 14.2182) centre (-3.3481, 13.149) ccw
  arc A89 (-1.4793, 16.5756) -> (-1.6137, 14.2182) centre (0.142, 15.3006) ccw
  arc A90 (-1.4793, 16.5756) -> (0.5526, 20.0948) centre (-12.7, 25.4) ccw
  arc A91 (2.5268, 21.3899) -> (0.5526, 20.0948) centre (2.4673, 19.3282) ccw
  arc A92 (2.5268, 21.3899) -> (4.6064, 23.1657) centre (2.5856, 23.4265) ccw
  arc A93 (4.6064, 23.1657) -> (4.6064, 27.6343) centre (-12.7, 25.4) ccw
  arc A94 (4.6064, 27.6343) -> (2.5268, 29.4101) centre (2.5856, 27.3735) ccw
  arc A95 (0.5526, 30.7052) -> (2.5268, 29.4101) centre (2.4673, 31.4718) ccw
  arc A96 (0.5526, 30.7052) -> (-1.4793, 34.2244) centre (-12.7, 25.4) ccw
  arc A97 (-1.6137, 36.5818) -> (-1.4793, 34.2244) centre (0.142, 35.4994) ccw
  arc A98 (-1.6137, 36.5818) -> (-2.1118, 39.2706) centre (-3.3481, 37.651) ccw
  arc A99 (-2.1118, 39.2706) -> (-5.9818, 41.5049) centre (-12.7, 25.4) ccw
  arc A100 (-5.9818, 41.5049) -> (-8.5594, 40.5919) centre (-6.7662, 39.6245) ccw
  arc A101 (-10.6682, 39.5297) -> (-8.5594, 40.5919) centre (-10.3746, 41.5712) ccw
  arc A102 (-10.6682, 39.5297) -> (-14.7318, 39.5297) centre (-12.7, 25.4) ccw
  arc A103 (-16.8406, 40.5919) -> (-14.7318, 39.5297) centre (-15.0254, 41.5712) ccw
  arc A104 (-16.8406, 40.5919) -> (-19.4182, 41.5049) centre (-18.6338, 39.6245) ccw
  arc A105 (-19.4182, 41.5049) -> (-23.2882, 39.2706) centre (-12.7, 25.4) ccw
  arc A106 (-23.2882, 39.2706) -> (-23.7863, 36.5818) centre (-22.0519, 37.651) ccw
  arc A107 (-23.9207, 34.2244) -> (-23.7863, 36.5818) centre (-25.542, 35.4994) ccw
  arc A108 (-22.6827, 33.2508) -> (-24.4904, 30.1199) centre (-12.7, 25.4) ccw
  arc A109 (-22.6827, 33.2508) -> (-22.4456, 37.4083) centre (-25.542, 35.4994) ccw
  arc A110 (-22.3325, 38.0186) -> (-22.4456, 37.4083) centre (-22.0519, 37.651) ccw
  arc A111 (-18.8118, 40.0513) -> (-22.3325, 38.0186) centre (-12.7, 25.4) ccw
  arc A112 (-18.2267, 39.8441) -> (-18.8118, 40.0513) centre (-18.6338, 39.6245) ccw
  arc A113 (-18.2267, 39.8441) -> (-14.5076, 37.9707) centre (-15.0254, 41.5712) ccw
  arc A114 (-10.8924, 37.9707) -> (-14.5076, 37.9707) centre (-12.7, 25.4) ccw
  arc A115 (-10.8924, 37.9707) -> (-7.1733, 39.8441) centre (-10.3746, 41.5712) ccw
  arc A116 (-6.5882, 40.0513) -> (-7.1733, 39.8441) centre (-6.7662, 39.6245) ccw
  arc A117 (-3.0675, 38.0186) -> (-6.5882, 40.0513) centre (-12.7, 25.4) ccw
  arc A118 (-2.9544, 37.4083) -> (-3.0675, 38.0186) centre (-3.3481, 37.651) ccw
  arc A119 (-2.9544, 37.4083) -> (-2.7173, 33.2508) centre (0.142, 35.4994) ccw
  arc A120 (-0.9096, 30.1199) -> (-2.7173, 33.2508) centre (-12.7, 25.4) ccw
  arc A121 (-0.9096, 30.1199) -> (2.5723, 27.8358) centre (2.4673, 31.4718) ccw
  arc A122 (3.0443, 27.4327) -> (2.5723, 27.8358) centre (2.5856, 27.3735) ccw
  arc A123 (3.0443, 23.3673) -> (3.0443, 27.4327) centre (-12.7, 25.4) ccw
  arc A124 (2.5723, 22.9642) -> (3.0443, 23.3673) centre (2.5856, 23.4265) ccw
  arc A125 (2.5723, 22.9642) -> (-0.9096, 20.6801) centre (2.4673, 19.3282) ccw
  arc A126 (-2.7173, 17.5492) -> (-0.9096, 20.6801) centre (-12.7, 25.4) ccw
  arc A127 (-2.7173, 17.5492) -> (-2.9544, 13.3917) centre (0.142, 15.3006) ccw
  arc A128 (-3.0675, 12.7814) -> (-2.9544, 13.3917) centre (-3.3481, 13.149) ccw
  arc A129 (-6.5882, 10.7487) -> (-3.0675, 12.7814) centre (-12.7, 25.4) ccw
  arc A130 (-7.1733, 10.9559) -> (-6.5882, 10.7487) centre (-6.7662, 11.1755) ccw
  arc A131 (-7.1733, 10.9559) -> (-10.8924, 12.8293) centre (-10.3746, 9.2288) ccw
  arc A132 (-14.5076, 12.8293) -> (-10.8924, 12.8293) centre (-12.7, 25.4) ccw
  arc A133 (-14.5076, 12.8293) -> (-18.2267, 10.9559) centre (-15.0254, 9.2288) ccw
  arc A134 (-18.8118, 10.7487) -> (-18.2267, 10.9559) centre (-18.6338, 11.1755) ccw
  arc A135 (-22.3325, 12.7814) -> (-18.8118, 10.7487) centre (-12.7, 25.4) ccw
  arc A136 (-22.4456, 13.3917) -> (-22.3325, 12.7814) centre (-22.0519, 13.149) ccw
  arc A137 (-22.4456, 13.3917) -> (-22.6827, 17.5492) centre (-25.542, 15.3006) ccw
  arc A138 (-24.4904, 20.6801) -> (-22.6827, 17.5492) centre (-12.7, 25.4) ccw
  arc A139 (-24.4904, 20.6801) -> (-27.9723, 22.9642) centre (-27.8673, 19.3282) ccw
  arc A140 (-28.4443, 23.3673) -> (-27.9723, 22.9642) centre (-27.9856, 23.4265) ccw
  arc A141 (-28.4443, 27.4327) -> (-28.4443, 23.3673) centre (-12.7, 25.4) ccw
  arc A142 (-27.9723, 27.8358) -> (-28.4443, 27.4327) centre (-27.9856, 27.3735) ccw
  arc A143 (-27.9723, 27.8358) -> (-24.4904, 30.1199) centre (-27.8673, 31.4718) ccw
  arc A144 (128.4793, 34.2244) -> (126.4474, 30.7052) centre (139.7, 25.4) ccw
  arc A145 (124.4732, 29.4101) -> (126.4474, 30.7052) centre (124.5327, 31.4718) ccw
  arc A146 (124.4732, 29.4101) -> (122.3936, 27.6343) centre (124.4144, 27.3735) ccw
  arc A147 (122.3936, 27.6343) -> (122.3936, 23.1657) centre (139.7, 25.4) ccw
  arc A148 (122.3936, 23.1657) -> (124.4732, 21.3899) centre (124.4144, 23.4265) ccw
  arc A149 (126.4474, 20.0948) -> (124.4732, 21.3899) centre (124.5327, 19.3282) ccw
  arc A150 (126.4474, 20.0948) -> (128.4793, 16.5756) centre (139.7, 25.4) ccw
  arc A151 (128.6137, 14.2182) -> (128.4793, 16.5756) centre (126.858, 15.3006) ccw
  arc A152 (128.6137, 14.2182) -> (129.1118, 11.5294) centre (130.3481, 13.149) ccw
  arc A153 (129.1118, 11.5294) -> (132.9818, 9.2951) centre (139.7, 25.4) ccw
  arc A154 (132.9818, 9.2951) -> (135.5594, 10.2081) centre (133.7662, 11.1755) ccw
  arc A155 (137.6682, 11.2703) -> (135.5594, 10.2081) centre (137.3746, 9.2288) ccw
  arc A156 (137.6682, 11.2703) -> (141.7318, 11.2703) centre (139.7, 25.4) ccw
  arc A157 (143.8406, 10.2081) -> (141.7318, 11.2703) centre (142.0254, 9.2288) ccw
  arc A158 (143.8406, 10.2081) -> (146.4182, 9.2951) centre (145.6338, 11.1755) ccw
  arc A159 (146.4182, 9.2951) -> (150.2882, 11.5294) centre (139.7, 25.4) ccw
  arc A160 (150.2882, 11.5294) -> (150.7863, 14.2182) centre (149.0519, 13.149) ccw
  arc A161 (150.9207, 16.5756) -> (150.7863, 14.2182) centre (152.542, 15.3006) ccw
  arc A162 (150.9207, 16.5756) -> (152.9526, 20.0948) centre (139.7, 25.4) ccw
  arc A163 (154.9268, 21.3899) -> (152.9526, 20.0948) centre (154.8673, 19.3282) ccw
  arc A164 (154.9268, 21.3899) -> (157.0064, 23.1657) centre (154.9856, 23.4265) ccw
  arc A165 (157.0064, 23.1657) -> (157.0064, 27.6343) centre (139.7, 25.4) ccw
  arc A166 (157.0064, 27.6343) -> (154.9268, 29.4101) centre (154.9856, 27.3735) ccw
  arc A167 (152.9526, 30.7052) -> (154.9268, 29.4101) centre (154.8673, 31.4718) ccw
  arc A168 (152.9526, 30.7052) -> (150.9207, 34.2244) centre (139.7, 25.4) ccw
  arc A169 (150.7863, 36.5818) -> (150.9207, 34.2244) centre (152.542, 35.4994) ccw
  arc A170 (150.7863, 36.5818) -> (150.2882, 39.2706) centre (149.0519, 37.651) ccw
  arc A171 (150.2882, 39.2706) -> (146.4182, 41.5049) centre (139.7, 25.4) ccw
  arc A172 (146.4182, 41.5049) -> (143.8406, 40.5919) centre (145.6338, 39.6245) ccw
  arc A173 (141.7318, 39.5297) -> (143.8406, 40.5919) centre (142.0254, 41.5712) ccw
  arc A174 (141.7318, 39.5297) -> (137.6682, 39.5297) centre (139.7, 25.4) ccw
  arc A175 (135.5594, 40.5919) -> (137.6682, 39.5297) centre (137.3746, 41.5712) ccw
  arc A176 (135.5594, 40.5919) -> (132.9818, 41.5049) centre (133.7662, 39.6245) ccw
  arc A177 (132.9818, 41.5049) -> (129.1118, 39.2706) centre (139.7, 25.4) ccw
  arc A178 (129.1118, 39.2706) -> (128.6137, 36.5818) centre (130.3481, 37.651) ccw
  arc A179 (128.4793, 34.2244) -> (128.6137, 36.5818) centre (126.858, 35.4994) ccw
  arc A180 (129.7173, 33.2508) -> (127.9096, 30.1199) centre (139.7, 25.4) ccw
  arc A181 (129.7173, 33.2508) -> (129.9544, 37.4083) centre (126.858, 35.4994) ccw
  arc A182 (130.0675, 38.0186) -> (129.9544, 37.4083) centre (130.3481, 37.651) ccw
  arc A183 (133.5882, 40.0513) -> (130.0675, 38.0186) centre (139.7, 25.4) ccw
  arc A184 (134.1733, 39.8441) -> (133.5882, 40.0513) centre (133.7662, 39.6245) ccw
  arc A185 (134.1733, 39.8441) -> (137.8924, 37.9707) centre (137.3746, 41.5712) ccw
  arc A186 (141.5076, 37.9707) -> (137.8924, 37.9707) centre (139.7, 25.4) ccw
  arc A187 (141.5076, 37.9707) -> (145.2267, 39.8441) centre (142.0254, 41.5712) ccw
  arc A188 (145.8118, 40.0513) -> (145.2267, 39.8441) centre (145.6338, 39.6245) ccw
  arc A189 (149.3325, 38.0186) -> (145.8118, 40.0513) centre (139.7, 25.4) ccw
  arc A190 (149.4456, 37.4083) -> (149.3325, 38.0186) centre (149.0519, 37.651) ccw
  arc A191 (149.4456, 37.4083) -> (149.6827, 33.2508) centre (152.542, 35.4994) ccw
  arc A192 (151.4904, 30.1199) -> (149.6827, 33.2508) centre (139.7, 25.4) ccw
  arc A193 (151.4904, 30.1199) -> (154.9723, 27.8358) centre (154.8673, 31.4718) ccw
  arc A194 (155.4443, 27.4327) -> (154.9723, 27.8358) centre (154.9856, 27.3735) ccw
  arc A195 (155.4443, 23.3673) -> (155.4443, 27.4327) centre (139.7, 25.4) ccw
  arc A196 (154.9723, 22.9642) -> (155.4443, 23.3673) centre (154.9856, 23.4265) ccw
  arc A197 (154.9723, 22.9642) -> (151.4904, 20.6801) centre (154.8673, 19.3282) ccw
  arc A198 (149.6827, 17.5492) -> (151.4904, 20.6801) centre (139.7, 25.4) ccw
  arc A199 (149.6827, 17.5492) -> (149.4456, 13.3917) centre (152.542, 15.3006) ccw
  arc A200 (149.3325, 12.7814) -> (149.4456, 13.3917) centre (149.0519, 13.149) ccw
  arc A201 (145.8118, 10.7487) -> (149.3325, 12.7814) centre (139.7, 25.4) ccw
  arc A202 (145.2267, 10.9559) -> (145.8118, 10.7487) centre (145.6338, 11.1755) ccw
  arc A203 (145.2267, 10.9559) -> (141.5076, 12.8293) centre (142.0254, 9.2288) ccw
  arc A204 (137.8924, 12.8293) -> (141.5076, 12.8293) centre (139.7, 25.4) ccw
  arc A205 (137.8924, 12.8293) -> (134.1733, 10.9559) centre (137.3746, 9.2288) ccw
  arc A206 (133.5882, 10.7487) -> (134.1733, 10.9559) centre (133.7662, 11.1755) ccw
  arc A207 (130.0675, 12.7814) -> (133.5882, 10.7487) centre (139.7, 25.4) ccw
  arc A208 (129.9544, 13.3917) -> (130.0675, 12.7814) centre (130.3481, 13.149) ccw
  arc A209 (129.9544, 13.3917) -> (129.7173, 17.5492) centre (126.858, 15.3006) ccw
  arc A210 (127.9096, 20.6801) -> (129.7173, 17.5492) centre (139.7, 25.4) ccw
  arc A211 (127.9096, 20.6801) -> (124.4277, 22.9642) centre (124.5327, 19.3282) ccw
  arc A212 (123.9557, 23.3673) -> (124.4277, 22.9642) centre (124.4144, 23.4265) ccw
  arc A213 (123.9557, 27.4327) -> (123.9557, 23.3673) centre (139.7, 25.4) ccw
  arc A214 (124.4277, 27.8358) -> (123.9557, 27.4327) centre (124.4144, 27.3735) ccw
  arc A215 (124.4277, 27.8358) -> (127.9096, 30.1199) centre (124.5327, 31.4718) ccw
  point P0 (88.9, 25.4)
  point P1 (0, 25.4)
  point P2 (30.1625, 39.1482)
  point P3 (46.0375, 11.6518)
  point P4 (30.1625, 39.1482)
  point P5 (0, 28.8128)
  point P6 (0, 25.4)
  point P7 (0, 28.799)
  point P8 (111.8108, 12.7)
  point P9 (762, 31.9181)
  point P10 (762, 18.8819)
  dimension "d78" = 50.8
  dimension "d98" = 101.6
  dimension "d69" = 38.1
  dimension "d93" = 25.4
  dimension "d97" = 38.1
extrude "MAXTube Hole" [suppressed]
extrude "MAXTube Outside" [suppressed]
pattern_linear "MAXTube Pattern" [suppressed]
mirror "MAXTube Mirror" [suppressed]
sketch "Sketch4" plane through (-12.7, 25.4, 88.9) normal (0, 1, 0) x (1, 0, 0)
  circle A0 centre (12.7, 12.7) radius 2.4892
  circle A1 centre (12.7, 12.7) radius 2.4892
  circle A2 centre (12.7, 12.7) radius 2.4892
  line L0 (25.4, 0) -> (0, 0) projected
  point P0 (12.7, 88.9)
  point P1 (12.573, 0)
  dimension "d80" = 4.9784
  dimension "d81" = 0
  dimension "d82" = 0
  dimension "d83" = 12.7
extrude "Left Top Hole" cut sketch "Sketch4" against normal through all
extrude "Mid Top Hole" [suppressed]
extrude "Right Top Hole" [suppressed]
pattern_linear "Top Holes" count 7 spacing 12.7 along (0, 0, -1) of "Left Top Hole"
mirror "Top Mirror" about plane through (0, 0, 0) normal (0, 0, 1) of "Left Top Hole", "Top Holes"
sketch "Sketch7" plane through (12.7, -25.4, 88.9) normal (1, 0, 0) x (0, 0, -1)
  line L0 (0, 0) -> (0, 50.8) projected
  line L1 (177.8, 50.8) -> (0, 50.8) projected
  circle A0 centre (99.822, 25.4) radius 2.4892
  circle A1 centre (137.922, 25.4) radius 2.4892
  line L2 (177.8, 50.8) -> (177.8, 0) projected
  circle A2 centre (99.822, 38.1) radius 2.4892
  circle A3 centre (137.922, 38.1) radius 2.4892
  circle A4 centre (99.822, 12.7) radius 2.4892
  circle A5 centre (137.922, 12.7) radius 2.4892
  circle A6 centre (99.822, 25.4) radius 2.4892
  circle A7 centre (137.922, 25.4) radius 2.4892
  line L3 (177.8, 0) -> (177.8, 50.8) projected
  line L4 (177.8, 0) -> (0, 0) projected
  dimension "d195" = 12.7
  dimension "d198" = 12.7
  dimension "d209" = 4.9784
  dimension "d210" = 12.7
  dimension "d212" = 12.7
  dimension "d213" = 77.978
  dimension "d214" = 38.1
extrude "Extrusion14" cut sketch "Sketch7" against normal blind 34.925 contours A0 | A1 | A2 | A3 | A4 | A5
sketch "Sketch9" plane through (-12.7, -25.4, 88.9) normal (-1, 0, 0) x (0, 0, 1)
  point P0 (-88.9, 25.4)
  point P1 (-107.95, 38.1)
ref_plane "Work Plane3" through (0, 0, -18.2563) normal (0, 0, 1) x (1, 0, 0)
equation "\"d3\" = WidthWall"
equation "\"d61\" = SideMiddleSpace"
equation "\"d12\" = d11"
equation "\"d0\" = Height"
equation "\"d1\" = Width"
equation "\"d2\" = HeightWall"
equation "\"d20\" = Length"
equation "\"d22\" = Length"
equation "\"Height\" = 50.8"
equation "\"Width\" = 25.4"
equation "\"HeightWall\" = 3.175"
equation "\"WidthWall\" = 3.175"
equation "\"Length\" = 177.8"
equation "\"Wall\" = 3.175"
equation "\"PlaneOffset_Side\" = -88.9"
equation "\"SideMiddleSpace\" = 12.7"
equation "\"Side_Length_Edge\" = 12.7"
equation "\"Side_Width_Space\" = 12.7"
equation "\"Side_Length_Space\" = 12.7"
equation "\"Side_Width_Count\" = 0"
equation "\"Side_Width_Edge\" = 12.7"
equation "\"Top_Width_Edge\" = 12.7"
equation "\"Top_Width_Space\" = 6.35"
equation "\"Top_Length_Space\" = 12.7"
equation "\"Top_Length_Edge\" = 12.7"
equation "\"TopMiddleSpace\" = 0"
equation "\"PlaneOffset_Top\" = -88.9"
equation "\"HoleSize\" = 4.9784"
properties part number "2024-100-005-Climber-Mount" material "Aluminum 6061"
